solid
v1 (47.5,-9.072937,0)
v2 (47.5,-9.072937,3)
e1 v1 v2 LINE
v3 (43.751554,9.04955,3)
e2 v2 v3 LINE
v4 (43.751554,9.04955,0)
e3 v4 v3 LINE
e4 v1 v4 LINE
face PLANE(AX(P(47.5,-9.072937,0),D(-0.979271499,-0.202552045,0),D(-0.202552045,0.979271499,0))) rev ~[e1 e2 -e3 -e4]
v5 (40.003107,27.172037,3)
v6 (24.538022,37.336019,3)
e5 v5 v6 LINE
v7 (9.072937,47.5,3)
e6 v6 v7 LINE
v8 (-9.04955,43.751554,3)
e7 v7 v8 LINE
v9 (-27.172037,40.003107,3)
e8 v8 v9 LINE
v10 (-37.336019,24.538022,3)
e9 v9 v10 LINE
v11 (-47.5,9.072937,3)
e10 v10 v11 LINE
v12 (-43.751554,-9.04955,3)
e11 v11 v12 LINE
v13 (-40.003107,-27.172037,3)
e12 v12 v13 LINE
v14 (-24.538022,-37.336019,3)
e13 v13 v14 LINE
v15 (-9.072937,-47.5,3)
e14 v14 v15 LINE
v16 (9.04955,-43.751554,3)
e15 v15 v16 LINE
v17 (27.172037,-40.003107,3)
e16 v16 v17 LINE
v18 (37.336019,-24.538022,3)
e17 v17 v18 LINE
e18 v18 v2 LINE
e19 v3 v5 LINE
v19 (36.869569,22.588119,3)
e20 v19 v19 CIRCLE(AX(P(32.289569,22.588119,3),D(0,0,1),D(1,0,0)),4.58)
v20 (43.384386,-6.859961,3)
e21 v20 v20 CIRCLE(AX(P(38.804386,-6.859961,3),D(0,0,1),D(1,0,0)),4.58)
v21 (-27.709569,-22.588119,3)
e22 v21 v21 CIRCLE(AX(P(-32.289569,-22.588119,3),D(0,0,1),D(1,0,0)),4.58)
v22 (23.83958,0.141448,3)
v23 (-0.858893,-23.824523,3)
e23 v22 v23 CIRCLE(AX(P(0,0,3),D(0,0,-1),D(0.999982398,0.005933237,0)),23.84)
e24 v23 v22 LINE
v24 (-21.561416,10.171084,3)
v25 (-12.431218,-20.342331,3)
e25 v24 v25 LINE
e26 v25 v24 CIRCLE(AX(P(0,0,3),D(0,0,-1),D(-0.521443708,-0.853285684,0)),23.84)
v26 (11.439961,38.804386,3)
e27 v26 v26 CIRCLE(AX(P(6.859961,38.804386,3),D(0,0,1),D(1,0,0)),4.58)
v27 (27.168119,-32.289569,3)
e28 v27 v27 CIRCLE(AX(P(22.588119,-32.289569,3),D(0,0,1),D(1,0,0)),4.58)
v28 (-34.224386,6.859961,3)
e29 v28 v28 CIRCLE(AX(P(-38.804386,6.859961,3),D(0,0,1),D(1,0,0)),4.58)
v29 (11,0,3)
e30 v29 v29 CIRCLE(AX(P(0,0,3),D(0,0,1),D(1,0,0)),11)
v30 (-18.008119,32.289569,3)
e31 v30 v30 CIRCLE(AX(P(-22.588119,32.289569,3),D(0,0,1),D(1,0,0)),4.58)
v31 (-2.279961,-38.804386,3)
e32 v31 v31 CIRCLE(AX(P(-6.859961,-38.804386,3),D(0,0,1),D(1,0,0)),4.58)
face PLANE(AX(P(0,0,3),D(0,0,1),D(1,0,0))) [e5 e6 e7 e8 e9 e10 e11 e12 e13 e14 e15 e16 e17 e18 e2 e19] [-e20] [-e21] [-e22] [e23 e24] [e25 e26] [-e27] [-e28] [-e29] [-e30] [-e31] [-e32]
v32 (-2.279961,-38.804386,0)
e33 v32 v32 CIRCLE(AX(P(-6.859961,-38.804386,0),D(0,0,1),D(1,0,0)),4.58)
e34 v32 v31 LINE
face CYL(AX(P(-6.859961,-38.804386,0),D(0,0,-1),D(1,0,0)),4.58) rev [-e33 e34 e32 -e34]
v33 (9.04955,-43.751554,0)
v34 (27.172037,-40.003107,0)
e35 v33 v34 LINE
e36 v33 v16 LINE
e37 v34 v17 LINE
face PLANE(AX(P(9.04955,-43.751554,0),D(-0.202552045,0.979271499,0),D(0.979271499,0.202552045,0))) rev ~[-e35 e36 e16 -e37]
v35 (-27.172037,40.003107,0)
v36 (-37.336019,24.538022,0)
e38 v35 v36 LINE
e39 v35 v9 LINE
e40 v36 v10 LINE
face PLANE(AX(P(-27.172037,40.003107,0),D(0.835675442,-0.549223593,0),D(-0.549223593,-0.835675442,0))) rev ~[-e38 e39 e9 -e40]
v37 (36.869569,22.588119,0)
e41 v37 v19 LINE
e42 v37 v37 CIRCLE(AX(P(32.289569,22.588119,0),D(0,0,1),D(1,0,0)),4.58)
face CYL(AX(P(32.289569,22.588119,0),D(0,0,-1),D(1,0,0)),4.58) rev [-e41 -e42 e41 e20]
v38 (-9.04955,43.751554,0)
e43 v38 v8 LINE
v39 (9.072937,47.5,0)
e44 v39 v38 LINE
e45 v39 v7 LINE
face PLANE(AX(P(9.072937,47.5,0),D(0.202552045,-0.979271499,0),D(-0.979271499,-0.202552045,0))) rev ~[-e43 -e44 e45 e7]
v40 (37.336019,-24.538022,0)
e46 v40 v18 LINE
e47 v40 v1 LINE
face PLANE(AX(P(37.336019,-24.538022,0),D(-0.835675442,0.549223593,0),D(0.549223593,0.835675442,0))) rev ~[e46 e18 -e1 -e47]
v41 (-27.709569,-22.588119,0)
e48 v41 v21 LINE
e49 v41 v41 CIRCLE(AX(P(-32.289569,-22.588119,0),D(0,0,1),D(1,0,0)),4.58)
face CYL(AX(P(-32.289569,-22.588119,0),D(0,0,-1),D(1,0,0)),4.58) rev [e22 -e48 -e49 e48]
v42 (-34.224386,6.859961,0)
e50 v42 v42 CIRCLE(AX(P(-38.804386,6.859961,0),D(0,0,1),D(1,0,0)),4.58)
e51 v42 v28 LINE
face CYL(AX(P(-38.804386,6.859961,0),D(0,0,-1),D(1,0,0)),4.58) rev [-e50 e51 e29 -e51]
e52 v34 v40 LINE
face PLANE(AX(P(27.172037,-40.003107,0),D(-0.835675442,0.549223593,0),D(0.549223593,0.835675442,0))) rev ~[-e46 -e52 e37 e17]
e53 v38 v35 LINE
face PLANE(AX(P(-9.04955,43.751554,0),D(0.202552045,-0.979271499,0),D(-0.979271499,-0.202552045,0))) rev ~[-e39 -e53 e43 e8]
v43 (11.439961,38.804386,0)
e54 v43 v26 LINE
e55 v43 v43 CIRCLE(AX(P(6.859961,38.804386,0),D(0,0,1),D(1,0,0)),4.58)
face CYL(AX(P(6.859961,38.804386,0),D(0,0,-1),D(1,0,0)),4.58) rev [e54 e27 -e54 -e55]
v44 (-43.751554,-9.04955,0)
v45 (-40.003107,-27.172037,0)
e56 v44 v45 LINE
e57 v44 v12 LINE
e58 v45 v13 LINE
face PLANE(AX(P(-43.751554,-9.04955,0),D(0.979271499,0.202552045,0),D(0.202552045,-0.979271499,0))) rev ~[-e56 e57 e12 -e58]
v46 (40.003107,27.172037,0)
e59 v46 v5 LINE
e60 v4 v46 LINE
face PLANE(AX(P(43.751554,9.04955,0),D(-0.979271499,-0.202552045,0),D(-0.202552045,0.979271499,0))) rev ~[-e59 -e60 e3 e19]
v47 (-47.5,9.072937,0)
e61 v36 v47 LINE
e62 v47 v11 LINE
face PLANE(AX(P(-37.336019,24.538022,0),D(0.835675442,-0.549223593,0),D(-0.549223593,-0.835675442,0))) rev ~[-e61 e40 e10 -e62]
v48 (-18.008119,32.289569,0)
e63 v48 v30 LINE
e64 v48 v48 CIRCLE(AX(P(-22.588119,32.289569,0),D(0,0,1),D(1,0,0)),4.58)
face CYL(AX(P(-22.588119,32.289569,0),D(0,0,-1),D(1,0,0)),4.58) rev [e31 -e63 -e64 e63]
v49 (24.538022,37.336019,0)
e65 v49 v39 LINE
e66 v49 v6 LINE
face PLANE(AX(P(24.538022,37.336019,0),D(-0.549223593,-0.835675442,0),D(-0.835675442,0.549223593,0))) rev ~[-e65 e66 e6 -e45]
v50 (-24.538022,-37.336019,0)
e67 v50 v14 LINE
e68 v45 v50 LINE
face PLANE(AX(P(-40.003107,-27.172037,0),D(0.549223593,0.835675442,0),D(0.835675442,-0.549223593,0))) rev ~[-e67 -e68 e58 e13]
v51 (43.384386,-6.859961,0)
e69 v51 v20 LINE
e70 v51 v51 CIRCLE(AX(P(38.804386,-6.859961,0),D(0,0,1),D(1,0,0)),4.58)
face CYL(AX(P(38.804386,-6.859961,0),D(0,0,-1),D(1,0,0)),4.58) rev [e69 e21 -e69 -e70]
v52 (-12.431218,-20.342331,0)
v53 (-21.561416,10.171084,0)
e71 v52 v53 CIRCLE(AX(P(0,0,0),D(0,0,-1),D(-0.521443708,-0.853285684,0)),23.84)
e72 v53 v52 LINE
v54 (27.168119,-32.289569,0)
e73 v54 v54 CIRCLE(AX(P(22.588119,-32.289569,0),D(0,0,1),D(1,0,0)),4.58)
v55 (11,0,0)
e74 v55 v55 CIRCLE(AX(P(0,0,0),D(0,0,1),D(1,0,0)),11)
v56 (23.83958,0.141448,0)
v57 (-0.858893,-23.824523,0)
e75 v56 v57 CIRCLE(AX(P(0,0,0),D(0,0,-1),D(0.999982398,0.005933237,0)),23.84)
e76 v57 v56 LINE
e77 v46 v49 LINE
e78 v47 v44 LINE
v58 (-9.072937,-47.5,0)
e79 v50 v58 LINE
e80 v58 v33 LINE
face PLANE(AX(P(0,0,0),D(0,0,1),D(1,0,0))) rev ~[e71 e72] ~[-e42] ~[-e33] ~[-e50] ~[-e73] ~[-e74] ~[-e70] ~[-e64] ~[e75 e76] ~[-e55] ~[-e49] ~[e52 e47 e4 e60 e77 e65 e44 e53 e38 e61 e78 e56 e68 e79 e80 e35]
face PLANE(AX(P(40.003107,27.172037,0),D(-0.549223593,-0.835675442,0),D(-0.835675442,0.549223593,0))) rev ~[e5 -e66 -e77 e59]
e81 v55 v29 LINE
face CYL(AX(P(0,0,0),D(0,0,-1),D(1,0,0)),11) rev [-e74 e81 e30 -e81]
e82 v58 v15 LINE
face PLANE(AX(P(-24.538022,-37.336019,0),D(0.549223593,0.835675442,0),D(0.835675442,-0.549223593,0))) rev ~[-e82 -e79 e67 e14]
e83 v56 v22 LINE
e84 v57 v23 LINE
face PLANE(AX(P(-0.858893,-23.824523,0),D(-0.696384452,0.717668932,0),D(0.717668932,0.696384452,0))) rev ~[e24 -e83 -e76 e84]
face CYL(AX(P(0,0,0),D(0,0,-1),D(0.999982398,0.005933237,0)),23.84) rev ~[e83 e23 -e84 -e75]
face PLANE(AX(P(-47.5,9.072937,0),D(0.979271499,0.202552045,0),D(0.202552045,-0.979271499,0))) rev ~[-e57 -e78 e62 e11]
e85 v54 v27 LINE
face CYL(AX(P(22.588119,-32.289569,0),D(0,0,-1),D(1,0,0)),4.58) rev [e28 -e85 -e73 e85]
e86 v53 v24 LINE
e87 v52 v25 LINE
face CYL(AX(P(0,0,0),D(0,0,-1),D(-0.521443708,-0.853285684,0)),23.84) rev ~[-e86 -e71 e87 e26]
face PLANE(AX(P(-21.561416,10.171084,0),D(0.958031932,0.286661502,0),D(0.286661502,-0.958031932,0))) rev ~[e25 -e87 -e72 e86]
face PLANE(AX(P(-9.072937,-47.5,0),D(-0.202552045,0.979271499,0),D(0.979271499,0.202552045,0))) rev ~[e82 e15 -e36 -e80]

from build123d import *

# Parameters (mm, degrees)
F1_R     = 4.58
F1_R_2   = 11
F2_DEPTH = 3


# Not quite as in the source:
# - a feature names something its author has since deleted; it is built from what else it names


with BuildPart() as f2:
    # F1 (on face) → F2 (new body)
    with BuildSketch(Plane.XY):
        Polygon((24.5380218439, 37.3360185584), (9.072936592, 47.5), (-9.0495502624, 43.7515535479), (-27.1720371169, 40.0031070959), (-37.3360185584, 24.5380218439), (-47.5, 9.072936592), (-43.7515535479, -9.0495502624), (-40.0031070959, -27.1720371169), (-24.5380218439, -37.3360185584), (-9.072936592, -47.5), (9.0495502624, -43.7515535479), (27.1720371169, -40.0031070959), (37.3360185584, -24.5380218439), (47.5, -9.072936592), (43.7515535479, 9.0495502624), (40.0031070959, 27.1720371169), align=None)
        with Locations((-6.8599609456, -38.8043858107)):
            Circle(F1_R, mode=Mode.SUBTRACT)
        with Locations((-32.2895692498, -22.5881194432)):
            Circle(F1_R, mode=Mode.SUBTRACT)
        with BuildLine():
            ThreePointArc((-12.4312179995, -20.3423307182), (-22.8394812689, -6.8340101965), (-21.5614159426, 10.1710836469))
            Line((-21.5614159426, 10.1710836469), (-12.4312179995, -20.3423307182))
        make_face(mode=Mode.SUBTRACT)
        with Locations((22.5881194432, -32.2895692498)):
            Circle(F1_R, mode=Mode.SUBTRACT)
        with BuildLine():
            Line((-0.8588934675, -23.8245231224), (23.8395803729, 0.1414483779))
            ThreePointArc((23.8395803729, 0.1414483779), (16.601805328, -17.1092273306), (-0.8588934675, -23.8245231224))
        make_face(mode=Mode.SUBTRACT)
        with Locations((38.8043858107, -6.8599609456)):
            Circle(F1_R, mode=Mode.SUBTRACT)
        with Locations((-38.8043858107, 6.8599609456)):
            Circle(F1_R, mode=Mode.SUBTRACT)
        with Locations((-22.5881194432, 32.2895692498)):
            Circle(F1_R, mode=Mode.SUBTRACT)
        Circle(F1_R_2, mode=Mode.SUBTRACT)
        with BuildLine():
            ThreePointArc((-14.3344307522, 19.0491389572), (5.5013141945, 23.1965760864), (21.3620855471, 10.5833312845))
            Line((21.3620855471, 10.5833312845), (-14.3344307522, 19.0491389572))
        make_face(mode=Mode.SUBTRACT)
        with Locations((32.2895692498, 22.5881194432)):
            Circle(F1_R, mode=Mode.SUBTRACT)
        with Locations((6.8599609456, 38.8043858107)):
            Circle(F1_R, mode=Mode.SUBTRACT)
        with BuildLine():
            Line((-14.3344307522, 19.0491389572), (21.3620855471, 10.5833312845))
            ThreePointArc((21.3620855471, 10.5833312845), (5.5013141945, 23.1965760864), (-14.3344307522, 19.0491389572))
        make_face()
    extrude(amount=F2_DEPTH)


solid = f2.part
